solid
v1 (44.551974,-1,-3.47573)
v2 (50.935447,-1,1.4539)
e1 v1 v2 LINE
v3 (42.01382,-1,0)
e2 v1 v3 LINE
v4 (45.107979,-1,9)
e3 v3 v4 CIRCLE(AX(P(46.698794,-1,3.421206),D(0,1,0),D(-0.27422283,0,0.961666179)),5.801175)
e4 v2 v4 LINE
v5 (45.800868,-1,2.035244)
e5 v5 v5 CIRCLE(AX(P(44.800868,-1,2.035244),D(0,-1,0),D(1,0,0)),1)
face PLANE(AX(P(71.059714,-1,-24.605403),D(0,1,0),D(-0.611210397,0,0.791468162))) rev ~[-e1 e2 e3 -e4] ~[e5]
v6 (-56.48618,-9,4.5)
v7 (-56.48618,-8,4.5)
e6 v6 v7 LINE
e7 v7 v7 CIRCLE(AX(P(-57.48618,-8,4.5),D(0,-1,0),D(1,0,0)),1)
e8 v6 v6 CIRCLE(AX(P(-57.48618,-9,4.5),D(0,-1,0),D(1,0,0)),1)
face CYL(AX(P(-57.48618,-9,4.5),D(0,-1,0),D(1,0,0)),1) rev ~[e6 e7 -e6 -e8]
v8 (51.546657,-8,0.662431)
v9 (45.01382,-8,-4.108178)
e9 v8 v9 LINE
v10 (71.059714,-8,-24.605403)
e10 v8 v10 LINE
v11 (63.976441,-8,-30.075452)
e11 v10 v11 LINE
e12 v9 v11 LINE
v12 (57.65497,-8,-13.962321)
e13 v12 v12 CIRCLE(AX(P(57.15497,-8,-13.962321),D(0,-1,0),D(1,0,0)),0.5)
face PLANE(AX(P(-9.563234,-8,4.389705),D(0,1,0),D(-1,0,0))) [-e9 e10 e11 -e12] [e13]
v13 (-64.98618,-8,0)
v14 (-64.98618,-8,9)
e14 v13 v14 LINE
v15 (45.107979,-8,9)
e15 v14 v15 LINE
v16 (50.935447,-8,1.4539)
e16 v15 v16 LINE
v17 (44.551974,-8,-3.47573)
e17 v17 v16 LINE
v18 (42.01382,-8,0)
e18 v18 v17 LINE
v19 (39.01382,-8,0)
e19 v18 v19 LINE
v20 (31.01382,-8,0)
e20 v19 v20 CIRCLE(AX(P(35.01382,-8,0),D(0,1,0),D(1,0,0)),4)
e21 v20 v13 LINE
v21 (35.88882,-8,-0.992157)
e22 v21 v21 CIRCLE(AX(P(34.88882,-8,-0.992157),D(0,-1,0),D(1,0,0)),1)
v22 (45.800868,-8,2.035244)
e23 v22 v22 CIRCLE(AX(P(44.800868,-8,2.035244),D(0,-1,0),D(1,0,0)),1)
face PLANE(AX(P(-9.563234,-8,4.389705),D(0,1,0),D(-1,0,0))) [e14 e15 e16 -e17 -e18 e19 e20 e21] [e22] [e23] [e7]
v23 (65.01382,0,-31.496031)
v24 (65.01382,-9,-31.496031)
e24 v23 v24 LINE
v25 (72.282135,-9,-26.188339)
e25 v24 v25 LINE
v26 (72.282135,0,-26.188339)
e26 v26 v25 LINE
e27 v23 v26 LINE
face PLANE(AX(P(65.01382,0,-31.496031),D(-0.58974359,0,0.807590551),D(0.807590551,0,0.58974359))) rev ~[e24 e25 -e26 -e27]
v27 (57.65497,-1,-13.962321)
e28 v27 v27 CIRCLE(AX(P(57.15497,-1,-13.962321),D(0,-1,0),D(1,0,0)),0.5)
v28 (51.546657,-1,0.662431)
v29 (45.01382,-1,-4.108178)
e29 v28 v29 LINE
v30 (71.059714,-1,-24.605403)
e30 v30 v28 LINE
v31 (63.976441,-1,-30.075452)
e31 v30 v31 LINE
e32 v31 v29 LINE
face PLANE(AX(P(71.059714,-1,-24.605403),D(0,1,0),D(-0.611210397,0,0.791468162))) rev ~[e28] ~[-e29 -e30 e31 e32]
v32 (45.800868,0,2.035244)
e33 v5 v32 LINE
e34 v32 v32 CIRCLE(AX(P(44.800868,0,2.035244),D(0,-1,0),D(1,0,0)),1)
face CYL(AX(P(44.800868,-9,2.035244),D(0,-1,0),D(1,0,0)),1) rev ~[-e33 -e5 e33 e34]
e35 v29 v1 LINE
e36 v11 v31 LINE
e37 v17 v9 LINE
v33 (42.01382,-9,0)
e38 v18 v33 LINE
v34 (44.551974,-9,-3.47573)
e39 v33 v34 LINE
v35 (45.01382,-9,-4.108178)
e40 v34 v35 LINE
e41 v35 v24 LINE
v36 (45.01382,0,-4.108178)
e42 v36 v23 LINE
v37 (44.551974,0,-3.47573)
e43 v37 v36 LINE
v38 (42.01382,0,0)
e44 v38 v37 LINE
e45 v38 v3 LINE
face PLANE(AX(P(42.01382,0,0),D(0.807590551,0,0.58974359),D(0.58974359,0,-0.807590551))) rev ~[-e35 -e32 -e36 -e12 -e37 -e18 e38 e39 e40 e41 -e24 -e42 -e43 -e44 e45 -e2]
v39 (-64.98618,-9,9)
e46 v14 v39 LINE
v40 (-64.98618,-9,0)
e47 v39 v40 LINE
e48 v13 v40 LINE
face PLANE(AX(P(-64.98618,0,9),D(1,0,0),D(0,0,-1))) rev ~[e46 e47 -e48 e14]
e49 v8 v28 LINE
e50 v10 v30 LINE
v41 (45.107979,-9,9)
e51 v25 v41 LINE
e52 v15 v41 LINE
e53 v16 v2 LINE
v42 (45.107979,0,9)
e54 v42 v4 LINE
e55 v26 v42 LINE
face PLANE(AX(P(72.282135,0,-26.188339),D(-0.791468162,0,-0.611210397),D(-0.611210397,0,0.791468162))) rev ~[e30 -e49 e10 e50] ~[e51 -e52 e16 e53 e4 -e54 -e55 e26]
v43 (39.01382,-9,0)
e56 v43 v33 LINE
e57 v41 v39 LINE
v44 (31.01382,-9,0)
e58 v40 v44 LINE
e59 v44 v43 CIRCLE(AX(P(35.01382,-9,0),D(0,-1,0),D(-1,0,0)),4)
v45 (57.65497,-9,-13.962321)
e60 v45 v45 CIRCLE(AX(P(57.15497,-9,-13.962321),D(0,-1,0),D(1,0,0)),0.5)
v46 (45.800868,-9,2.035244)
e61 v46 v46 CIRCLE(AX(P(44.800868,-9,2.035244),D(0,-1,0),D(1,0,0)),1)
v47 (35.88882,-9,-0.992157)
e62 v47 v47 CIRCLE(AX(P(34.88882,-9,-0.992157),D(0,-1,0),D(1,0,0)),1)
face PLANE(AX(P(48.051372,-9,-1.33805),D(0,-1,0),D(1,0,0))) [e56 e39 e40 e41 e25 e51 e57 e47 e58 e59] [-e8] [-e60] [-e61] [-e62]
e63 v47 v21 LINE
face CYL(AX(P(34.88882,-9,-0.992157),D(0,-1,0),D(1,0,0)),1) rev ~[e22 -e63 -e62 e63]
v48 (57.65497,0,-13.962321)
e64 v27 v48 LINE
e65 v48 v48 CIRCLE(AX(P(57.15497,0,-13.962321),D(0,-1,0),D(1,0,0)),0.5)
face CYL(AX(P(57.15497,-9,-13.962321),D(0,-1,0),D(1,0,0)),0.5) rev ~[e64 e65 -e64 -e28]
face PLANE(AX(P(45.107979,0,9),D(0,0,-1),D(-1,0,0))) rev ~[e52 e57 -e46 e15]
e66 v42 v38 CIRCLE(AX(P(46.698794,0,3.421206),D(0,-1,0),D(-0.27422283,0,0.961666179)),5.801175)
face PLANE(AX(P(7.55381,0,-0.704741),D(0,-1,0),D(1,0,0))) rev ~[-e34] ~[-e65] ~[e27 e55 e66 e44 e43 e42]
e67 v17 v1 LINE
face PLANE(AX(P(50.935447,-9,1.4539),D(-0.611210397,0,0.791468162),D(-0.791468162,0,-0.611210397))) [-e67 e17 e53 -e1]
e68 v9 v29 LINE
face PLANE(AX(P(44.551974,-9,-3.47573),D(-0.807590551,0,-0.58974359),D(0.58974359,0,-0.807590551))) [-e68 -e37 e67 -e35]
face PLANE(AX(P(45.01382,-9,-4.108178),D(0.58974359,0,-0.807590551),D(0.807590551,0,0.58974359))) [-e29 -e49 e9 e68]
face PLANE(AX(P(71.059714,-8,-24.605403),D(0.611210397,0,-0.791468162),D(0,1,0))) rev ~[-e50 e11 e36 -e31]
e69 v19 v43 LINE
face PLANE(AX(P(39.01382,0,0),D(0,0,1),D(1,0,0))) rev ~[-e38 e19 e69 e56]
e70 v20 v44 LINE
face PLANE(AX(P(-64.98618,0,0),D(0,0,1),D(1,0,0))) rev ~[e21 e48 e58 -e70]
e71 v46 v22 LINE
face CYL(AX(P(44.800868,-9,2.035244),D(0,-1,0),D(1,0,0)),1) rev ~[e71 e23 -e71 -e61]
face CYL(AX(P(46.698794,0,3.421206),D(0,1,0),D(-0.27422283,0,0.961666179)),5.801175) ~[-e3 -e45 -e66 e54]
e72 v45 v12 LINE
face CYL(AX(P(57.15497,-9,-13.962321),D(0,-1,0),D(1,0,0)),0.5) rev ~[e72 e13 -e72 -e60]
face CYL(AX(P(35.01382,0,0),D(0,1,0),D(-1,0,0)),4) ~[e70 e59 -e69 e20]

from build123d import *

# Parameters (mm, degrees)
F1_DEPTH  = 9
F3_DEPTH  = 8
F4_W      = 7
F4_H      = 42.4595763843
F4_H_2    = 6.157477504
F5_DEPTH  = 111.888617615
F7_DEPTH  = 9
F8_R      = 1
F8_R_2    = 0.5
F9_DEPTH  = 9.001
F10_R     = 1
F11_DEPTH = 9.001


# Not quite as in the source:
# - a feature names something its author has since deleted; it is built from what else it names


with BuildPart() as f1:
    # F0 (on Front) → F1 (new body)
    with BuildSketch(Plane.XZ):
        Polygon((-64.9861803949, 9), (-64.9861803949, 0), (31.0138196051, 0), (39.0138196051, 0), (42.0138196051, 0), (65.0138196051, -31.496031496), (72.2821345657, -26.1883391884), (45.1079792442, 9), align=None)
        with BuildLine():
            Line((39.0138196051, 0), (31.0138196051, 0))
            ThreePointArc((31.0138196051, 0), (35.0138196051, -4), (39.0138196051, 0))
        make_face()
    extrude(amount=F1_DEPTH)

    # F2 (on face) → F3 (cut)
    with BuildSketch(Plane(origin=(0, 0, 0), x_dir=(-1, 0, 0), z_dir=(0, 1, 0))):
        with BuildLine():
            ThreePointArc((-45.1079792442, 9), (-41.2127769921, 5.307273962), (-42.0138196051, 0))
            Line((-42.0138196051, 0), (-39.0138196051, 0))
            ThreePointArc((-39.0138196051, 0), (-35.0138196051, -4), (-31.0138196051, 0))
            Line((-31.0138196051, 0), (64.9861803949, 0))
            Line((64.9861803949, 0), (64.9861803949, 9))
            Line((64.9861803949, 9), (-45.1079792442, 9))
        make_face()
    extrude(amount=-F3_DEPTH, mode=Mode.SUBTRACT)

    # F4 (on face) → F5 (cut, through all)
    with BuildSketch(Plane(origin=(32.6104059702, 0, 25.1833492962), x_dir=(0, 1, 0), z_dir=(0.7914681616, 0, 0.6112103968))):
        with Locations((-4.5, -41.6770406282)):
            Rectangle(F4_W, F4_H)
        with Locations((-4.5, -17.368513684)):
            Rectangle(F4_W, F4_H_2)
    extrude(amount=-F5_DEPTH, mode=Mode.SUBTRACT)

    # F6 (on face) → F7 (join)
    with BuildSketch(Plane.XZ.offset(9)):
        Polygon((45.0138196051, -4.1081780212), (51.5466572041, 0.662431406), (50.9354468073, 1.4538995677), (44.551974041, -3.4757300893), align=None)
    extrude(amount=-F7_DEPTH)

    # F8 (on face) → F9 (cut, through all)
    with BuildSketch(Plane.XZ.offset(9)):
        with Locations((44.8008679783, 2.0352441098)):
            Circle(F8_R)
        with Locations((57.1549696039, -13.9623209745)):
            Circle(F8_R_2)
        with Locations((-57.4861803949, 4.5)):
            Circle(F8_R)
    extrude(amount=-F9_DEPTH, mode=Mode.SUBTRACT)

    # F10 (on face) → F11 (cut, through all)
    with BuildSketch(Plane.XZ.offset(9)):
        with Locations((-60.9861803949, -1.4662119793)):
            Circle(F10_R)
        with Locations((34.8888196051, -0.9921567416)):
            Circle(F10_R)
    extrude(amount=-F11_DEPTH, mode=Mode.SUBTRACT)


solid = f1.part
